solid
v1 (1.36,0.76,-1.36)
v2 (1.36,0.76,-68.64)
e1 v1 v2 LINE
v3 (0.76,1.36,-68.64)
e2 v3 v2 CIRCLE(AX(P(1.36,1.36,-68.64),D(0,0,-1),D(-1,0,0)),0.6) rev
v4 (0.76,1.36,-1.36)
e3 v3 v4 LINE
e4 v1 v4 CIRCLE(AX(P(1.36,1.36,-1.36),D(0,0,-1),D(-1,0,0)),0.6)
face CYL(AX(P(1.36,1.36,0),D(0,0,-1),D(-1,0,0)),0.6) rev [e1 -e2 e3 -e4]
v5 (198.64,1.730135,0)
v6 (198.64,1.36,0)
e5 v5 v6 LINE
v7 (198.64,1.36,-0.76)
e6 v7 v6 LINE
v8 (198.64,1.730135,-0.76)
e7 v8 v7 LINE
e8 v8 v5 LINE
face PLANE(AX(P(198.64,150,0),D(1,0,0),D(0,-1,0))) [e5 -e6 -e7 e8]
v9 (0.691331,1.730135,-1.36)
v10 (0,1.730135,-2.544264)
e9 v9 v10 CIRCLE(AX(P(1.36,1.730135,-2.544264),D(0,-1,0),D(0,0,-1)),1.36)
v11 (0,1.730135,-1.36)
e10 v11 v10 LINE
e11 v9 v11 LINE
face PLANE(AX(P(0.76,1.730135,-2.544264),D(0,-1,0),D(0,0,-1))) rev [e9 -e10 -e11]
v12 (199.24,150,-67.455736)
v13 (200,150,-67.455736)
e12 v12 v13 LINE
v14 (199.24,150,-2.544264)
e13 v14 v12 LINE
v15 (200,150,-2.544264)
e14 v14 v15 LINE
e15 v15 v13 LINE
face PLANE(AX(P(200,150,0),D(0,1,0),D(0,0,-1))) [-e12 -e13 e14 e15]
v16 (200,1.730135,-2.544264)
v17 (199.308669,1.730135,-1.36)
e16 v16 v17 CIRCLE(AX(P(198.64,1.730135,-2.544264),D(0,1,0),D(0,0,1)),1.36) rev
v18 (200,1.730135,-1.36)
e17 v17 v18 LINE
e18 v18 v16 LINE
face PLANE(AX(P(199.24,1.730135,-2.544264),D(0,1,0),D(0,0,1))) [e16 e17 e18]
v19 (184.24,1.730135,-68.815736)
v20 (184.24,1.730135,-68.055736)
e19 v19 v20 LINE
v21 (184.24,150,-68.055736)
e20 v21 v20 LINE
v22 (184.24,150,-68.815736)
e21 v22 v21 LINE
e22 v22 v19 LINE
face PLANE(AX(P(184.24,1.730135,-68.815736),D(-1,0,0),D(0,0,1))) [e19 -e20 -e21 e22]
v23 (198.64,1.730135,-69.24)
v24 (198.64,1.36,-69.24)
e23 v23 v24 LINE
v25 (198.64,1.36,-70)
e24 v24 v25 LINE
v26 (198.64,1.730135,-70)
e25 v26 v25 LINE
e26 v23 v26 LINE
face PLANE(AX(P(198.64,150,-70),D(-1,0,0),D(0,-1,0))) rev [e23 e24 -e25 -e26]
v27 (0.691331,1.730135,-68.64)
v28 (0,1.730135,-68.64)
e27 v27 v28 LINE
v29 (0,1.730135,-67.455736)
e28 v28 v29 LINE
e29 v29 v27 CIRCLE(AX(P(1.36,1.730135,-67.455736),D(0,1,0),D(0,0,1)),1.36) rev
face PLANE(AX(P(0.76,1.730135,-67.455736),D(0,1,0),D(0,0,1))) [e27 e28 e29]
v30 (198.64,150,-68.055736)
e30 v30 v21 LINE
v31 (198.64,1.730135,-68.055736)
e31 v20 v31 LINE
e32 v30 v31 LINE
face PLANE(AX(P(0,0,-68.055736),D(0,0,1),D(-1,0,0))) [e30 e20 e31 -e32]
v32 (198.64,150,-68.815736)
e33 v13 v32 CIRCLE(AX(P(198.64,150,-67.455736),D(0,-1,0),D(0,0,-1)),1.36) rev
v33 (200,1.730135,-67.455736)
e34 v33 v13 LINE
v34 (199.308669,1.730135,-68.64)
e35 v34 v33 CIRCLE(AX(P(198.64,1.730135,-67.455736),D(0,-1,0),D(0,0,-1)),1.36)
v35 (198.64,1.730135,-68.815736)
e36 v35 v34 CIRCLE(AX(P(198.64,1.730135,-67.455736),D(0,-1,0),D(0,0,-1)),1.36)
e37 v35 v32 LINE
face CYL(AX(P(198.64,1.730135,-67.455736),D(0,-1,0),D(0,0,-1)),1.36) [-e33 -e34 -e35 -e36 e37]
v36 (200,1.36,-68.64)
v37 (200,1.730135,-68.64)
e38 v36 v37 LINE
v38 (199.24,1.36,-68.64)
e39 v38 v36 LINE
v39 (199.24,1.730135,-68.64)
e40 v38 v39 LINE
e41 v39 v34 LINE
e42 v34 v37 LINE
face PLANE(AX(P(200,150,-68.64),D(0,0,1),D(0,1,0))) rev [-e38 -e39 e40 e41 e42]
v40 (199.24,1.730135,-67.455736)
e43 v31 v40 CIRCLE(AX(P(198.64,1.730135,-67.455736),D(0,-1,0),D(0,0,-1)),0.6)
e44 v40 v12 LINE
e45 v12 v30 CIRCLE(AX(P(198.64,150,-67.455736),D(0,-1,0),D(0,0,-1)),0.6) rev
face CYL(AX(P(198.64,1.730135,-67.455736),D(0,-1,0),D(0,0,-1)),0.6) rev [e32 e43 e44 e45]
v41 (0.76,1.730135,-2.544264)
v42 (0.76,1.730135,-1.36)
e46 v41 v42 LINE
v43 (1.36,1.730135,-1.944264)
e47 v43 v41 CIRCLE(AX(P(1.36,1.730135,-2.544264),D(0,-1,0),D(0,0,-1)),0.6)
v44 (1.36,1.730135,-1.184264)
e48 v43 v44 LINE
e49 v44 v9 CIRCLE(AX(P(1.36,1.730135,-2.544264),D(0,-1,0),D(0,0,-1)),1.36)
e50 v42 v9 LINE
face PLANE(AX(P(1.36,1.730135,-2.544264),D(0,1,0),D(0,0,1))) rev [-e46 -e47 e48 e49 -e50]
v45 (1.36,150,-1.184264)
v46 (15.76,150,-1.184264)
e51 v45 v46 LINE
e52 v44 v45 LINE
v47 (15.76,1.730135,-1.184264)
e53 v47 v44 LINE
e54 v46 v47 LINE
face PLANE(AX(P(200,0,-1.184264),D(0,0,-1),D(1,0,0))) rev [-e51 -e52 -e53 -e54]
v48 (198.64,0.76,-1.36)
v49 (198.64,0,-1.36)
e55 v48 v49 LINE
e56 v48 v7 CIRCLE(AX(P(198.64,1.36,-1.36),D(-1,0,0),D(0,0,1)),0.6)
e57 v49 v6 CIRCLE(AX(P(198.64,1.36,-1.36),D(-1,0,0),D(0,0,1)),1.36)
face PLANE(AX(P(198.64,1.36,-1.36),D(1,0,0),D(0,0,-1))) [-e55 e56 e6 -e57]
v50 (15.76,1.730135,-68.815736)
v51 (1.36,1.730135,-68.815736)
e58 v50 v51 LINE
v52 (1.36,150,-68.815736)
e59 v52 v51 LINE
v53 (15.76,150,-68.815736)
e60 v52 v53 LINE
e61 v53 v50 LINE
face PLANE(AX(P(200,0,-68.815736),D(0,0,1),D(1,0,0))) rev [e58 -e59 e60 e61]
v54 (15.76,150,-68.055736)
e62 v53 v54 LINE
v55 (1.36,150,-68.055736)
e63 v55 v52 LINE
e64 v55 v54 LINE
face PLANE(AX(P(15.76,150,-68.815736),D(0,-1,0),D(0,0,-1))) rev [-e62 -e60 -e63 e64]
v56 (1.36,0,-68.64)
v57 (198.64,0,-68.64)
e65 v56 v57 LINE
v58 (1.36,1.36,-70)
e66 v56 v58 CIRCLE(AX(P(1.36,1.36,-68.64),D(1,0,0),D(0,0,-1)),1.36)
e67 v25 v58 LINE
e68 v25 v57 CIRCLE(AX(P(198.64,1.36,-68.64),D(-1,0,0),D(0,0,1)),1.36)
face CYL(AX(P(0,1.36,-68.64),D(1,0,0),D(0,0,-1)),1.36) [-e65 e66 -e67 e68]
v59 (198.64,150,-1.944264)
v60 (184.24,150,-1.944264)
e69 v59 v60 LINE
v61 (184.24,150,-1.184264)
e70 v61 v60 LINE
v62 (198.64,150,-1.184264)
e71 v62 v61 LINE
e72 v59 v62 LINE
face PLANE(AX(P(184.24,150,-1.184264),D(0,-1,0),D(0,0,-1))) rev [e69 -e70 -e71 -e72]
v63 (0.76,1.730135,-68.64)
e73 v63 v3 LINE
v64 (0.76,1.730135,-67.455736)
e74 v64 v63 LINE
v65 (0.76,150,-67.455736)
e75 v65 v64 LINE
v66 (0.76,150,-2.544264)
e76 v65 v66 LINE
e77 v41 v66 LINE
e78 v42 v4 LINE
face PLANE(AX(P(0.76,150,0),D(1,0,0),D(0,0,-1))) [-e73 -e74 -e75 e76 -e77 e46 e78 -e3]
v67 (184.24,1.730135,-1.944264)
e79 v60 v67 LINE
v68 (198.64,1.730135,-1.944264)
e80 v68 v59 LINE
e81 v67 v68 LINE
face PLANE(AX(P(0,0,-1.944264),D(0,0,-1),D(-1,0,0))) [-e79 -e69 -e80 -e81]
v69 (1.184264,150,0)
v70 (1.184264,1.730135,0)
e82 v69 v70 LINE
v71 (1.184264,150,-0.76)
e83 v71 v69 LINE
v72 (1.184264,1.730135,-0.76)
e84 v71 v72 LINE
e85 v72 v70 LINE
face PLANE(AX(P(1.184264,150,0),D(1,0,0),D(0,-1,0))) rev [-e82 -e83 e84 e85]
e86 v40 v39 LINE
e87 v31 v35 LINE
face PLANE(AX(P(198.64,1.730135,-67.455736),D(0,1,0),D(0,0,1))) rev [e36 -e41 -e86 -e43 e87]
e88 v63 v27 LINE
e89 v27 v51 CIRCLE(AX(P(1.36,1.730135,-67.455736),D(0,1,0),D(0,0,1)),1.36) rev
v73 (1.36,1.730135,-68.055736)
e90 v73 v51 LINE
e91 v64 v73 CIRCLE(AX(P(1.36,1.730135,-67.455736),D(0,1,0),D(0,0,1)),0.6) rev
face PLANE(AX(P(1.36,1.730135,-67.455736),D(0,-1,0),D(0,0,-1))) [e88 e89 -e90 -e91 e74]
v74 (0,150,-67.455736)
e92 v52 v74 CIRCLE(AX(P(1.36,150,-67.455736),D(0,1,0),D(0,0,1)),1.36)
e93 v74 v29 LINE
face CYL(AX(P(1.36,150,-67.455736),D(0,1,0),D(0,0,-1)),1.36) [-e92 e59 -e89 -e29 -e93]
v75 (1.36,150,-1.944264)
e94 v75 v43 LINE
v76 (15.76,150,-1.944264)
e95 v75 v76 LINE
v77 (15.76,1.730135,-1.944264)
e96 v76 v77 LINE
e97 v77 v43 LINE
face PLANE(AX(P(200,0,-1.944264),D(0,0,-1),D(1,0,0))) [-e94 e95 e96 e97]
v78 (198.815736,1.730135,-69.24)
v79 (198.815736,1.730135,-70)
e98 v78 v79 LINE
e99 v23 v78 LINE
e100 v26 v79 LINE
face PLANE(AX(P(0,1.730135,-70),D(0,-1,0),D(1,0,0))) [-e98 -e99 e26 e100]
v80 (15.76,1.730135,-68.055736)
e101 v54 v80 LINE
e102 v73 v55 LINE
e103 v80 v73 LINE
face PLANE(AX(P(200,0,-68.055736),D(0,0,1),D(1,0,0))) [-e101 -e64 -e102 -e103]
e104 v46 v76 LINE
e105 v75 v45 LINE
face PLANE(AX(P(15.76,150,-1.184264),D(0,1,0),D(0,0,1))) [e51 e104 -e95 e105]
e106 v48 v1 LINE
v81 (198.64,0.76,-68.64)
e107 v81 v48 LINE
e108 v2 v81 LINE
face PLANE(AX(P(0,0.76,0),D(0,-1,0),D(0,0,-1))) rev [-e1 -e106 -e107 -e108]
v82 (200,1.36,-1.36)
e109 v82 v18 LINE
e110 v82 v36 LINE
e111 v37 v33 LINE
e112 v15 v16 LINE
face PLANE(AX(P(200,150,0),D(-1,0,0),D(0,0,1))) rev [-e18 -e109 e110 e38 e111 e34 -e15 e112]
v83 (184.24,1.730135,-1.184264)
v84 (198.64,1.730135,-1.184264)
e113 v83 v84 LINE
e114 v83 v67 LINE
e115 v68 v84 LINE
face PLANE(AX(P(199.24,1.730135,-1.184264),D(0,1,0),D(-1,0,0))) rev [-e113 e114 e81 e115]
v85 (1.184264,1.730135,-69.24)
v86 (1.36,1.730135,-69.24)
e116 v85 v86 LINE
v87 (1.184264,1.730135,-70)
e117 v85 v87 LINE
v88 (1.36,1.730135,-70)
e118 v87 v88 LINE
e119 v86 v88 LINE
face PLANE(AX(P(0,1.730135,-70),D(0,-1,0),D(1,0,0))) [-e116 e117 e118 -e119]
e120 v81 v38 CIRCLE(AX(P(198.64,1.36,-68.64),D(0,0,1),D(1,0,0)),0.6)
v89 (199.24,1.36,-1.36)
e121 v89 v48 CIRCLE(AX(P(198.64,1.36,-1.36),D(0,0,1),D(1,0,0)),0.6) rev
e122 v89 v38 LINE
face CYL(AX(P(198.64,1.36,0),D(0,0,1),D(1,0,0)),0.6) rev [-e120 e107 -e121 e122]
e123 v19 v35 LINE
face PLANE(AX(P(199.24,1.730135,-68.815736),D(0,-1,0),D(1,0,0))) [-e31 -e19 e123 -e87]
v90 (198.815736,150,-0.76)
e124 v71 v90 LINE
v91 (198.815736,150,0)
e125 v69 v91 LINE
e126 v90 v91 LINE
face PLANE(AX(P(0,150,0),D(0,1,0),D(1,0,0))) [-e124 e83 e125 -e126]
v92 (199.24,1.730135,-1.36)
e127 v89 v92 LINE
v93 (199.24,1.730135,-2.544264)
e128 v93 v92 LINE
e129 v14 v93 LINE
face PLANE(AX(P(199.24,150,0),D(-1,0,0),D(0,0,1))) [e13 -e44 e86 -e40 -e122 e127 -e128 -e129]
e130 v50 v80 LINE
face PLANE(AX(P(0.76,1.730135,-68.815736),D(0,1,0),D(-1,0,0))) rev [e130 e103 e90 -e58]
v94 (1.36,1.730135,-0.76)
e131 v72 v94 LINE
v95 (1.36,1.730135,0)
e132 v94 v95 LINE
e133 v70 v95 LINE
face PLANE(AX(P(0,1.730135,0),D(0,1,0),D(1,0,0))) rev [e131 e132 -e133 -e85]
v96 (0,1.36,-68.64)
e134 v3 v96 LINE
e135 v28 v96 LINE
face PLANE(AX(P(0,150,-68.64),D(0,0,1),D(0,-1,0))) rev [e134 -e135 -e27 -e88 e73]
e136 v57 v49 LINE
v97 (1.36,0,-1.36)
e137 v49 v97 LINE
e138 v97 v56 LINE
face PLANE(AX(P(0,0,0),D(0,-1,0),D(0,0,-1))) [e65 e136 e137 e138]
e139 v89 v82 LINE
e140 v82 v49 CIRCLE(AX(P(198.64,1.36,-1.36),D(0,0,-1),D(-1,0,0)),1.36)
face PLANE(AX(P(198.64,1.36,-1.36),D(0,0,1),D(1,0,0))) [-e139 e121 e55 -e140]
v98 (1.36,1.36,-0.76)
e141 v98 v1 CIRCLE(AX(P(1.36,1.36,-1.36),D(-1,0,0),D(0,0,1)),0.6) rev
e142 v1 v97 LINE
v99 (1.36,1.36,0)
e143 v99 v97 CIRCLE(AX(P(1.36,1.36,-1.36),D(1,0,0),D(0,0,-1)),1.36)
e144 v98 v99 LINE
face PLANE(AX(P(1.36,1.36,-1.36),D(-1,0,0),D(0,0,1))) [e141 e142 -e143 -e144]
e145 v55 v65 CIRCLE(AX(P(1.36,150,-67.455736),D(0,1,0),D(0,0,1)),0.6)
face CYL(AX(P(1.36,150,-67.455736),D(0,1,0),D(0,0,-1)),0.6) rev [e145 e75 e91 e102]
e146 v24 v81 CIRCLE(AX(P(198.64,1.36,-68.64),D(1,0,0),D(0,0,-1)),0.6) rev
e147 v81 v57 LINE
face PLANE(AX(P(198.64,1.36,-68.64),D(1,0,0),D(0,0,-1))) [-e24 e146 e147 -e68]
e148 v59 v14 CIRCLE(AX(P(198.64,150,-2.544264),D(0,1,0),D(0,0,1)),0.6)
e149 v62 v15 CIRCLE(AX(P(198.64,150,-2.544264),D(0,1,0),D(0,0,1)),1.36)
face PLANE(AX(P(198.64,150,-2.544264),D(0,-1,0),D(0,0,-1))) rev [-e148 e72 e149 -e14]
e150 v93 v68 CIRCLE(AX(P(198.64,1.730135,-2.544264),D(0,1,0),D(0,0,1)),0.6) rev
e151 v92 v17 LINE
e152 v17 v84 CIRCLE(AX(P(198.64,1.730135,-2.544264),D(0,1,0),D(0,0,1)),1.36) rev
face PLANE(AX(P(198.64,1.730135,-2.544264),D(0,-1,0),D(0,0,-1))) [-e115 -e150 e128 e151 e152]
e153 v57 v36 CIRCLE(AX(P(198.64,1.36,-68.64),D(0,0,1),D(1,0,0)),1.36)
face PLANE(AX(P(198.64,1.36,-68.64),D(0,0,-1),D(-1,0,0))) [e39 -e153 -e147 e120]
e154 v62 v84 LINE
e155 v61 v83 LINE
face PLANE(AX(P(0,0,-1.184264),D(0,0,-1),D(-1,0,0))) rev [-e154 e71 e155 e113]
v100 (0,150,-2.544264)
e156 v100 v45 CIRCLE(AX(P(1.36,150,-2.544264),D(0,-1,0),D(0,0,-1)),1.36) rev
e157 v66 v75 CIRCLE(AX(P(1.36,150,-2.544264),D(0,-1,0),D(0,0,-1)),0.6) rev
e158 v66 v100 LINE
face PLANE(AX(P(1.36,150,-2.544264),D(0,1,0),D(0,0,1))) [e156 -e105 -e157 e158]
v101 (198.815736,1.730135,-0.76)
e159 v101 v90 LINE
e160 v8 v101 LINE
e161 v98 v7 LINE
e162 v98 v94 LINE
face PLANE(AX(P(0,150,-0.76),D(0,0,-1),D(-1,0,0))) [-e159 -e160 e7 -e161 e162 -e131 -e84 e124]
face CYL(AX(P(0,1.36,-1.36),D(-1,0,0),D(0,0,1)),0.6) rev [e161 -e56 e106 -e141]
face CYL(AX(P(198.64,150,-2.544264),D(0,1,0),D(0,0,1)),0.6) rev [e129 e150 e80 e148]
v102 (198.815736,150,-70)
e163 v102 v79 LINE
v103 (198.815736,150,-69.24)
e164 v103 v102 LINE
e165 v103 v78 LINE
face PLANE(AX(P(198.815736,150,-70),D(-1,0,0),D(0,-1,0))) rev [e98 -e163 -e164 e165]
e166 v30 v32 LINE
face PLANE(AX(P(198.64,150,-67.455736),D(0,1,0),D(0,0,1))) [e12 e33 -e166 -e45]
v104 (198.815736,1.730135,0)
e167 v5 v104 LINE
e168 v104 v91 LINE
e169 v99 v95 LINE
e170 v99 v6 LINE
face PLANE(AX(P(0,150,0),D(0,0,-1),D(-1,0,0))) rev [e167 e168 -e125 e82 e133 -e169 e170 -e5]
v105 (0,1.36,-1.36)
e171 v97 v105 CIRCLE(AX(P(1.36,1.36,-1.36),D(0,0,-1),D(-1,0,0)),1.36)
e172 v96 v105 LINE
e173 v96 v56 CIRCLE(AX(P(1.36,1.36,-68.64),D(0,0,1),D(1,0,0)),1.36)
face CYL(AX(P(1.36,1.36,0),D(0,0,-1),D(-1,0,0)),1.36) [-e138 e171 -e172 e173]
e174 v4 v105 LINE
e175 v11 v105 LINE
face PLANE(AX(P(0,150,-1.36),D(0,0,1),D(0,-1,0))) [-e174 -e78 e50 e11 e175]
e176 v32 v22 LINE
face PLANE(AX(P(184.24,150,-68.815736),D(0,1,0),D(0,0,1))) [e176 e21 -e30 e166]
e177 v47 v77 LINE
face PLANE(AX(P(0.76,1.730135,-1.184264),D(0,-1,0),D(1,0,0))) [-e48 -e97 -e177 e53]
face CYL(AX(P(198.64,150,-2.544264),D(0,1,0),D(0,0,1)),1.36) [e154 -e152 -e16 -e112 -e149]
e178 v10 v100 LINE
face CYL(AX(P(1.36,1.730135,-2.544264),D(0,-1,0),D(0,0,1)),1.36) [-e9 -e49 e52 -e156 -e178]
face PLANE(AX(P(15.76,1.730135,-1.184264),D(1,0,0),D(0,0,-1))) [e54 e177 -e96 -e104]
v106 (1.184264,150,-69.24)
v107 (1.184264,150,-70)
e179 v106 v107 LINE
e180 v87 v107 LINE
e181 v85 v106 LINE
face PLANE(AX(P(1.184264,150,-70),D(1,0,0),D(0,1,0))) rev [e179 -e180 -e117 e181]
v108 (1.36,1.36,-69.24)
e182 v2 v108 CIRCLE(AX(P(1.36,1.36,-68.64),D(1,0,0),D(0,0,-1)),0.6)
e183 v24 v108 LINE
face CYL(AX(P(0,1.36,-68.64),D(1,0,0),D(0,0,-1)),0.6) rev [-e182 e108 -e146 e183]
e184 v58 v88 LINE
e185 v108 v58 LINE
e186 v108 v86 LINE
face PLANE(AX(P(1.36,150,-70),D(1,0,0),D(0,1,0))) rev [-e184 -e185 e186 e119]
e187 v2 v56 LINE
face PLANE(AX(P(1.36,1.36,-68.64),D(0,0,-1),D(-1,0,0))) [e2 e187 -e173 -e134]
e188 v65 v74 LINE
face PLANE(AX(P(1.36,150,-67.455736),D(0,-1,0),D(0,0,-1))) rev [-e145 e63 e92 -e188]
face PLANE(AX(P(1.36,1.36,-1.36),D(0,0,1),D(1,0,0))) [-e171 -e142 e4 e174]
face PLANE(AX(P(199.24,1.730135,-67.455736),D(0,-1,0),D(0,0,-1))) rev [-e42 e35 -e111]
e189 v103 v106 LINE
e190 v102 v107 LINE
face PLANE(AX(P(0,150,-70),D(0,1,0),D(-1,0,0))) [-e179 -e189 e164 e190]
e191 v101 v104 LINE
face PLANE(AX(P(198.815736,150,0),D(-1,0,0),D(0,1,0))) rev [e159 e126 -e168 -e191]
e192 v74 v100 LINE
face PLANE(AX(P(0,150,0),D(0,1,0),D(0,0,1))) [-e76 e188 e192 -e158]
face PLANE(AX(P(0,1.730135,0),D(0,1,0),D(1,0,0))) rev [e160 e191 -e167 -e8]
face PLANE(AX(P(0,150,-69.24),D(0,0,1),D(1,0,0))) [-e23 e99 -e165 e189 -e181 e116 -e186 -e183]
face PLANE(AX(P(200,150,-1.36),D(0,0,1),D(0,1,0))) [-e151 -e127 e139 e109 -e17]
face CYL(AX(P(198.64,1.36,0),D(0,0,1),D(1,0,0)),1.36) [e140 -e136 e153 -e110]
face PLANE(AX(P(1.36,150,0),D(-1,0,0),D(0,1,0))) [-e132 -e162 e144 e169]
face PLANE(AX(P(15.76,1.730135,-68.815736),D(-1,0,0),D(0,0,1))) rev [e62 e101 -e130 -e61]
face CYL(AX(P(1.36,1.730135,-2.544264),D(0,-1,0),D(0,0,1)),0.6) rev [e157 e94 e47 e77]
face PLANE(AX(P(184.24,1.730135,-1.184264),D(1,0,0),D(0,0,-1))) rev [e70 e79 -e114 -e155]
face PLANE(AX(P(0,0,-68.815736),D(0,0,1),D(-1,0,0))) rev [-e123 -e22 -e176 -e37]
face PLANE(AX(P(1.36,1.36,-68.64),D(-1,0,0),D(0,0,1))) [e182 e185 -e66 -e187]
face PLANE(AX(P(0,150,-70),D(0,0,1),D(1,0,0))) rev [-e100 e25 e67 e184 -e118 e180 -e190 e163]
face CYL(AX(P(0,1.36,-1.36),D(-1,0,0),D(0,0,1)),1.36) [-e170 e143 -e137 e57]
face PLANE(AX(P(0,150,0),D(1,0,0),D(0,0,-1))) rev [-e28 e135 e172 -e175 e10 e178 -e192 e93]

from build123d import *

# Parameters (mm, degrees)
SKETCH1_W                    = 200
SKETCH1_H                    = 70
BOSS_EXTRUDE1_DEPTH          = 150
CONVERT_SOLID1_START         = 1.36
CONVERT_SOLID1_DEPTH         = 197.28
CONVERT_SOLID1_START_2       = -1
CONVERT_SOLID1_2_DEPTH       = 202
CONVERT_SOLID1_3_DEPTH       = 2.184264069
CONVERT_SOLID1_START_3       = 198.815735931
CONVERT_SOLID1_4_DEPTH       = 2.184264069
CONVERT_SOLID1_START_4       = 1.184264069
CONVERT_SOLID1_5_DEPTH       = 197.631471862
CONVERT_SOLID1_6_DEPTH       = 0.175735931
CONVERT_SOLID1_START_5       = 198.64
CONVERT_SOLID1_7_DEPTH       = 0.175735931
CONVERT_SOLID1_START_6       = -68.815735931
CONVERT_SOLID1_8_DEPTH       = 67.631471862
CONVERT_SOLID1_9_DEPTH       = 0.175735931
CONVERT_SOLID1_START_7       = -1.36
CONVERT_SOLID1_10_DEPTH      = 0.175735931
EDGE_FLANGE1_STRIP_W         = 4.24
EDGE_FLANGE1_STRIP_H         = 0.76
EDGE_FLANGE1_STRIP_CUT_DEPTH = 148.269865
EDGE_FLANGE1_DEPTH           = 148.269865
MIRROR2_COPY_1_SKETCH_W      = 4.24
MIRROR2_COPY_1_SKETCH_H      = 0.76
MIRROR2_COPY_1_DEPTH         = 148.269865
MIRROR2_COPY_2_DEPTH         = 148.269865


with BuildPart() as part:
    # Sketch1 → Boss-Extrude1 (new body)
    with BuildSketch(Plane(origin=(0, 0, 0), x_dir=(1, 0, 0), z_dir=(0, 1, 0))):
        with Locations((100, 35)):
            Rectangle(SKETCH1_W, SKETCH1_H)
    extrude(amount=BOSS_EXTRUDE1_DEPTH)

    # Convert-Solid1: read off the stored shape, not the designer's step
    # Convert-Solid1 outline → Convert-Solid1 (cut)
    with BuildSketch(Plane.YZ.offset(CONVERT_SOLID1_START)):
        with BuildLine():
            Line((150, -0.76), (1.36, -0.76))
            ThreePointArc((1.36, -0.76), (0.935735931, -0.935735931), (0.76, -1.36))
            Line((0.76, -1.36), (0.76, -68.64))
            ThreePointArc((0.76, -68.64), (0.935735931, -69.064264069), (1.36, -69.24))
            Line((1.36, -69.24), (150, -69.24))
            Line((150, -69.24), (150, -0.76))
        make_face()
    extrude(amount=CONVERT_SOLID1_DEPTH, mode=Mode.SUBTRACT)

    # Convert-Solid1 2 outline → Convert-Solid1 2 (cut)
    with BuildSketch(Plane.YZ.offset(CONVERT_SOLID1_START_2)):
        with BuildLine():
            Line((0.76, -1.36), (1.730135, -1.36))
            Line((1.730135, -1.36), (1.730135, -1.184264069))
            Line((1.730135, -1.184264069), (150, -1.184264069))
            Line((150, -1.184264069), (150, -0.76))
            Line((150, -0.76), (1.36, -0.76))
            ThreePointArc((1.36, -0.76), (0.935735931, -0.935735931), (0.76, -1.36))
        make_face()
        with BuildLine():
            Line((1.730135, -68.64), (0.76, -68.64))
            ThreePointArc((0.76, -68.64), (0.935735931, -69.064264069), (1.36, -69.24))
            Line((1.36, -69.24), (150, -69.24))
            Line((150, -69.24), (150, -68.815735931))
            Line((150, -68.815735931), (1.730135, -68.815735931))
            Line((1.730135, -68.815735931), (1.730135, -68.64))
        make_face()
    extrude(amount=CONVERT_SOLID1_2_DEPTH, mode=Mode.SUBTRACT)

    # Convert-Solid1 3 outline → Convert-Solid1 3 (cut)
    with BuildSketch(Plane.YZ.offset(CONVERT_SOLID1_START_2)):
        with BuildLine():
            Line((150, -69.24), (1.36, -69.24))
            ThreePointArc((1.36, -69.24), (0.935735931, -69.064264069), (0.76, -68.64))
            Line((0.76, -68.64), (0, -68.64))
            Line((0, -68.64), (0, -70))
            Line((0, -70), (150, -70))
            Line((150, -70), (150, -69.24))
        make_face()
        with BuildLine():
            Line((0, 0), (0, -1.36))
            Line((0, -1.36), (0.76, -1.36))
            ThreePointArc((0.76, -1.36), (0.935735931, -0.935735931), (1.36, -0.76))
            Line((1.36, -0.76), (150, -0.76))
            Line((150, -0.76), (150, 0))
            Line((150, 0), (0, 0))
        make_face()
    extrude(amount=CONVERT_SOLID1_3_DEPTH, mode=Mode.SUBTRACT)

    # Convert-Solid1 4 outline → Convert-Solid1 4 (cut)
    with BuildSketch(Plane.YZ.offset(CONVERT_SOLID1_START_3)):
        with BuildLine():
            Line((150, -69.24), (1.36, -69.24))
            ThreePointArc((1.36, -69.24), (0.935735931, -69.064264069), (0.76, -68.64))
            Line((0.76, -68.64), (0, -68.64))
            Line((0, -68.64), (0, -70))
            Line((0, -70), (150, -70))
            Line((150, -70), (150, -69.24))
        make_face()
        with BuildLine():
            Line((0, 0), (0, -1.36))
            Line((0, -1.36), (0.76, -1.36))
            ThreePointArc((0.76, -1.36), (0.935735931, -0.935735931), (1.36, -0.76))
            Line((1.36, -0.76), (150, -0.76))
            Line((150, -0.76), (150, 0))
            Line((150, 0), (0, 0))
        make_face()
    extrude(amount=CONVERT_SOLID1_4_DEPTH, mode=Mode.SUBTRACT)

    # Convert-Solid1 5 outline → Convert-Solid1 5 (cut)
    with BuildSketch(Plane.YZ.offset(CONVERT_SOLID1_START_4)):
        with BuildLine():
            Line((0, -70), (1.36, -70))
            ThreePointArc((1.36, -70), (0.398334778, -69.601665222), (0, -68.64))
            Line((0, -68.64), (0, -70))
        make_face()
        with BuildLine():
            Line((0, 0), (0, -1.36))
            ThreePointArc((0, -1.36), (0.398334778, -0.398334778), (1.36, 0))
            Line((1.36, 0), (0, 0))
        make_face()
    extrude(amount=CONVERT_SOLID1_5_DEPTH, mode=Mode.SUBTRACT)

    # Convert-Solid1 6 outline → Convert-Solid1 6 (cut)
    with BuildSketch(Plane.YZ.offset(CONVERT_SOLID1_START_4)):
        with BuildLine():
            Line((1.730135, -70), (1.730135, -69.24))
            Line((1.730135, -69.24), (1.36, -69.24))
            ThreePointArc((1.36, -69.24), (0.935735931, -69.064264069), (0.76, -68.64))
            Line((0.76, -68.64), (0, -68.64))
            ThreePointArc((0, -68.64), (0.398334778, -69.601665222), (1.36, -70))
            Line((1.36, -70), (1.730135, -70))
        make_face()
        with BuildLine():
            ThreePointArc((1.36, 0), (0.398334778, -0.398334778), (0, -1.36))
            Line((0, -1.36), (0.76, -1.36))
            ThreePointArc((0.76, -1.36), (0.935735931, -0.935735931), (1.36, -0.76))
            Line((1.36, -0.76), (1.730135, -0.76))
            Line((1.730135, -0.76), (1.730135, 0))
            Line((1.730135, 0), (1.36, 0))
        make_face()
    extrude(amount=CONVERT_SOLID1_6_DEPTH, mode=Mode.SUBTRACT)

    # Convert-Solid1 7 outline → Convert-Solid1 7 (cut)
    with BuildSketch(Plane.YZ.offset(CONVERT_SOLID1_START_5)):
        with BuildLine():
            Line((1.730135, -70), (1.730135, -69.24))
            Line((1.730135, -69.24), (1.36, -69.24))
            ThreePointArc((1.36, -69.24), (0.935735931, -69.064264069), (0.76, -68.64))
            Line((0.76, -68.64), (0, -68.64))
            ThreePointArc((0, -68.64), (0.398334778, -69.601665222), (1.36, -70))
            Line((1.36, -70), (1.730135, -70))
        make_face()
        with BuildLine():
            ThreePointArc((1.36, 0), (0.398334778, -0.398334778), (0, -1.36))
            Line((0, -1.36), (0.76, -1.36))
            ThreePointArc((0.76, -1.36), (0.935735931, -0.935735931), (1.36, -0.76))
            Line((1.36, -0.76), (1.730135, -0.76))
            Line((1.730135, -0.76), (1.730135, 0))
            Line((1.730135, 0), (1.36, 0))
        make_face()
    extrude(amount=CONVERT_SOLID1_7_DEPTH, mode=Mode.SUBTRACT)

    # Convert-Solid1 8 outline → Convert-Solid1 8 (cut)
    with BuildSketch(Plane.XY.offset(CONVERT_SOLID1_START_6)):
        with BuildLine():
            Line((0, 0), (1.36, 0))
            ThreePointArc((1.36, 0), (0.398334778, 0.398334778), (0, 1.36))
            Line((0, 1.36), (0, 0))
        make_face()
        with BuildLine():
            ThreePointArc((200, 1.36), (199.601665222, 0.398334778), (198.64, 0))
            Line((198.64, 0), (200, 0))
            Line((200, 0), (200, 1.36))
        make_face()
        with BuildLine():
            ThreePointArc((0.76, 1.36), (0.935735931, 0.935735931), (1.36, 0.76))
            Line((1.36, 0.76), (1.36, 150))
            Line((1.36, 150), (0.76, 150))
            Line((0.76, 150), (0.76, 1.36))
        make_face()
        with BuildLine():
            ThreePointArc((198.64, 0.76), (199.064264069, 0.935735931), (199.24, 1.36))
            Line((199.24, 1.36), (199.24, 150))
            Line((199.24, 150), (198.64, 150))
            Line((198.64, 150), (198.64, 0.76))
        make_face()
    extrude(amount=CONVERT_SOLID1_8_DEPTH, mode=Mode.SUBTRACT)

    # Convert-Solid1 9 outline → Convert-Solid1 9 (cut)
    with BuildSketch(Plane.XY.offset(CONVERT_SOLID1_START_6)):
        with BuildLine():
            ThreePointArc((0, 1.36), (0.398334778, 0.398334778), (1.36, 0))
            Line((1.36, 0), (1.36, 0.76))
            ThreePointArc((1.36, 0.76), (0.935735931, 0.935735931), (0.76, 1.36))
            Line((0.76, 1.36), (0.76, 1.730135))
            Line((0.76, 1.730135), (0, 1.730135))
            Line((0, 1.730135), (0, 1.36))
        make_face()
        with BuildLine():
            Line((198.64, 0.76), (198.64, 0))
            ThreePointArc((198.64, 0), (199.601665222, 0.398334778), (200, 1.36))
            Line((200, 1.36), (200, 1.730135))
            Line((200, 1.730135), (199.24, 1.730135))
            Line((199.24, 1.730135), (199.24, 1.36))
            ThreePointArc((199.24, 1.36), (199.064264069, 0.935735931), (198.64, 0.76))
        make_face()
    extrude(amount=CONVERT_SOLID1_9_DEPTH, mode=Mode.SUBTRACT)

    # Convert-Solid1 10 outline → Convert-Solid1 10 (cut)
    with BuildSketch(Plane.XY.offset(CONVERT_SOLID1_START_7)):
        with BuildLine():
            ThreePointArc((0, 1.36), (0.398334778, 0.398334778), (1.36, 0))
            Line((1.36, 0), (1.36, 0.76))
            ThreePointArc((1.36, 0.76), (0.935735931, 0.935735931), (0.76, 1.36))
            Line((0.76, 1.36), (0.76, 1.730135))
            Line((0.76, 1.730135), (0, 1.730135))
            Line((0, 1.730135), (0, 1.36))
        make_face()
        with BuildLine():
            Line((198.64, 0.76), (198.64, 0))
            ThreePointArc((198.64, 0), (199.601665222, 0.398334778), (200, 1.36))
            Line((200, 1.36), (200, 1.730135))
            Line((200, 1.730135), (199.24, 1.730135))
            Line((199.24, 1.730135), (199.24, 1.36))
            ThreePointArc((199.24, 1.36), (199.064264069, 0.935735931), (198.64, 0.76))
        make_face()
    extrude(amount=CONVERT_SOLID1_10_DEPTH, mode=Mode.SUBTRACT)

    # Edge-Flange1: sheet metal written as solids
    # Edge-Flange1 strip (on a plane across the edge) → Edge-Flange1 strip cut (cut)
    with BuildSketch(Plane(origin=(199.24, 1.730135, -1.184264069), x_dir=(0, 0, -1), z_dir=(0, 1, 0))):
        with Locations((-0.76, -0.38)):
            Rectangle(EDGE_FLANGE1_STRIP_W, EDGE_FLANGE1_STRIP_H)
    edge_flange1_strip_cut = extrude(amount=EDGE_FLANGE1_STRIP_CUT_DEPTH, mode=Mode.SUBTRACT)

    # Edge-Flange1 section (on a plane across the edge) → Edge-Flange1 (add)
    with BuildSketch(Plane(origin=(199.24, 1.730135, -1.184264069), x_dir=(0, 0, -1), z_dir=(0, 1, 0))):
        with BuildLine():
            Line((0, 0.6), (0, 15))
            Line((0, 15), (0.76, 15))
            Line((0.76, 15), (0.76, 0.6))
            ThreePointArc((0.76, 0.6), (0.935735931, 0.175735931), (1.36, 0))
            Line((1.36, 0), (1.36, -0.76))
            ThreePointArc((1.36, -0.76), (0.398334778, -0.361665222), (0, 0.6))
        make_face()
    edge_flange1 = extrude(amount=EDGE_FLANGE1_DEPTH)

    # Mirror1: Edge-Flange1 strip cut, Edge-Flange1 across plane
    add(edge_flange1_strip_cut.mirror(Plane(origin=(100, 0, 0), x_dir=(0, 0, 1), z_dir=(1, 0, 0))), mode=Mode.SUBTRACT)
    add(edge_flange1.mirror(Plane(origin=(100, 0, 0), x_dir=(0, 0, 1), z_dir=(1, 0, 0))))

    # Mirror2: Edge-Flange1 strip cut, Edge-Flange1 across plane
    add(edge_flange1_strip_cut.mirror(Plane.XY.offset(-35)), mode=Mode.SUBTRACT)
    add(edge_flange1.mirror(Plane.XY.offset(-35)))

    # Mirror2 copy 1 sketch → Mirror2 copy 1 (cut)
    with BuildSketch(Plane(origin=(0.76, 1.730135, -68.815735931), x_dir=(0, 0, 1), z_dir=(0, 1, 0))):
        with Locations((-0.76, -0.38)):
            Rectangle(MIRROR2_COPY_1_SKETCH_W, MIRROR2_COPY_1_SKETCH_H)
    extrude(amount=MIRROR2_COPY_1_DEPTH, mode=Mode.SUBTRACT)

    # Mirror2 copy 2 sketch → Mirror2 copy 2 (add)
    with BuildSketch(Plane(origin=(0.76, 1.730135, -68.815735931), x_dir=(0, 0, 1), z_dir=(0, 1, 0))):
        with BuildLine():
            Line((0, 0.6), (0, 15))
            Line((0, 15), (0.76, 15))
            Line((0.76, 15), (0.76, 0.6))
            ThreePointArc((0.76, 0.6), (0.935735931, 0.175735931), (1.36, 0))
            Line((1.36, 0), (1.36, -0.76))
            ThreePointArc((1.36, -0.76), (0.398334778, -0.361665222), (0, 0.6))
        make_face()
    extrude(amount=MIRROR2_COPY_2_DEPTH)


solid = part.part
